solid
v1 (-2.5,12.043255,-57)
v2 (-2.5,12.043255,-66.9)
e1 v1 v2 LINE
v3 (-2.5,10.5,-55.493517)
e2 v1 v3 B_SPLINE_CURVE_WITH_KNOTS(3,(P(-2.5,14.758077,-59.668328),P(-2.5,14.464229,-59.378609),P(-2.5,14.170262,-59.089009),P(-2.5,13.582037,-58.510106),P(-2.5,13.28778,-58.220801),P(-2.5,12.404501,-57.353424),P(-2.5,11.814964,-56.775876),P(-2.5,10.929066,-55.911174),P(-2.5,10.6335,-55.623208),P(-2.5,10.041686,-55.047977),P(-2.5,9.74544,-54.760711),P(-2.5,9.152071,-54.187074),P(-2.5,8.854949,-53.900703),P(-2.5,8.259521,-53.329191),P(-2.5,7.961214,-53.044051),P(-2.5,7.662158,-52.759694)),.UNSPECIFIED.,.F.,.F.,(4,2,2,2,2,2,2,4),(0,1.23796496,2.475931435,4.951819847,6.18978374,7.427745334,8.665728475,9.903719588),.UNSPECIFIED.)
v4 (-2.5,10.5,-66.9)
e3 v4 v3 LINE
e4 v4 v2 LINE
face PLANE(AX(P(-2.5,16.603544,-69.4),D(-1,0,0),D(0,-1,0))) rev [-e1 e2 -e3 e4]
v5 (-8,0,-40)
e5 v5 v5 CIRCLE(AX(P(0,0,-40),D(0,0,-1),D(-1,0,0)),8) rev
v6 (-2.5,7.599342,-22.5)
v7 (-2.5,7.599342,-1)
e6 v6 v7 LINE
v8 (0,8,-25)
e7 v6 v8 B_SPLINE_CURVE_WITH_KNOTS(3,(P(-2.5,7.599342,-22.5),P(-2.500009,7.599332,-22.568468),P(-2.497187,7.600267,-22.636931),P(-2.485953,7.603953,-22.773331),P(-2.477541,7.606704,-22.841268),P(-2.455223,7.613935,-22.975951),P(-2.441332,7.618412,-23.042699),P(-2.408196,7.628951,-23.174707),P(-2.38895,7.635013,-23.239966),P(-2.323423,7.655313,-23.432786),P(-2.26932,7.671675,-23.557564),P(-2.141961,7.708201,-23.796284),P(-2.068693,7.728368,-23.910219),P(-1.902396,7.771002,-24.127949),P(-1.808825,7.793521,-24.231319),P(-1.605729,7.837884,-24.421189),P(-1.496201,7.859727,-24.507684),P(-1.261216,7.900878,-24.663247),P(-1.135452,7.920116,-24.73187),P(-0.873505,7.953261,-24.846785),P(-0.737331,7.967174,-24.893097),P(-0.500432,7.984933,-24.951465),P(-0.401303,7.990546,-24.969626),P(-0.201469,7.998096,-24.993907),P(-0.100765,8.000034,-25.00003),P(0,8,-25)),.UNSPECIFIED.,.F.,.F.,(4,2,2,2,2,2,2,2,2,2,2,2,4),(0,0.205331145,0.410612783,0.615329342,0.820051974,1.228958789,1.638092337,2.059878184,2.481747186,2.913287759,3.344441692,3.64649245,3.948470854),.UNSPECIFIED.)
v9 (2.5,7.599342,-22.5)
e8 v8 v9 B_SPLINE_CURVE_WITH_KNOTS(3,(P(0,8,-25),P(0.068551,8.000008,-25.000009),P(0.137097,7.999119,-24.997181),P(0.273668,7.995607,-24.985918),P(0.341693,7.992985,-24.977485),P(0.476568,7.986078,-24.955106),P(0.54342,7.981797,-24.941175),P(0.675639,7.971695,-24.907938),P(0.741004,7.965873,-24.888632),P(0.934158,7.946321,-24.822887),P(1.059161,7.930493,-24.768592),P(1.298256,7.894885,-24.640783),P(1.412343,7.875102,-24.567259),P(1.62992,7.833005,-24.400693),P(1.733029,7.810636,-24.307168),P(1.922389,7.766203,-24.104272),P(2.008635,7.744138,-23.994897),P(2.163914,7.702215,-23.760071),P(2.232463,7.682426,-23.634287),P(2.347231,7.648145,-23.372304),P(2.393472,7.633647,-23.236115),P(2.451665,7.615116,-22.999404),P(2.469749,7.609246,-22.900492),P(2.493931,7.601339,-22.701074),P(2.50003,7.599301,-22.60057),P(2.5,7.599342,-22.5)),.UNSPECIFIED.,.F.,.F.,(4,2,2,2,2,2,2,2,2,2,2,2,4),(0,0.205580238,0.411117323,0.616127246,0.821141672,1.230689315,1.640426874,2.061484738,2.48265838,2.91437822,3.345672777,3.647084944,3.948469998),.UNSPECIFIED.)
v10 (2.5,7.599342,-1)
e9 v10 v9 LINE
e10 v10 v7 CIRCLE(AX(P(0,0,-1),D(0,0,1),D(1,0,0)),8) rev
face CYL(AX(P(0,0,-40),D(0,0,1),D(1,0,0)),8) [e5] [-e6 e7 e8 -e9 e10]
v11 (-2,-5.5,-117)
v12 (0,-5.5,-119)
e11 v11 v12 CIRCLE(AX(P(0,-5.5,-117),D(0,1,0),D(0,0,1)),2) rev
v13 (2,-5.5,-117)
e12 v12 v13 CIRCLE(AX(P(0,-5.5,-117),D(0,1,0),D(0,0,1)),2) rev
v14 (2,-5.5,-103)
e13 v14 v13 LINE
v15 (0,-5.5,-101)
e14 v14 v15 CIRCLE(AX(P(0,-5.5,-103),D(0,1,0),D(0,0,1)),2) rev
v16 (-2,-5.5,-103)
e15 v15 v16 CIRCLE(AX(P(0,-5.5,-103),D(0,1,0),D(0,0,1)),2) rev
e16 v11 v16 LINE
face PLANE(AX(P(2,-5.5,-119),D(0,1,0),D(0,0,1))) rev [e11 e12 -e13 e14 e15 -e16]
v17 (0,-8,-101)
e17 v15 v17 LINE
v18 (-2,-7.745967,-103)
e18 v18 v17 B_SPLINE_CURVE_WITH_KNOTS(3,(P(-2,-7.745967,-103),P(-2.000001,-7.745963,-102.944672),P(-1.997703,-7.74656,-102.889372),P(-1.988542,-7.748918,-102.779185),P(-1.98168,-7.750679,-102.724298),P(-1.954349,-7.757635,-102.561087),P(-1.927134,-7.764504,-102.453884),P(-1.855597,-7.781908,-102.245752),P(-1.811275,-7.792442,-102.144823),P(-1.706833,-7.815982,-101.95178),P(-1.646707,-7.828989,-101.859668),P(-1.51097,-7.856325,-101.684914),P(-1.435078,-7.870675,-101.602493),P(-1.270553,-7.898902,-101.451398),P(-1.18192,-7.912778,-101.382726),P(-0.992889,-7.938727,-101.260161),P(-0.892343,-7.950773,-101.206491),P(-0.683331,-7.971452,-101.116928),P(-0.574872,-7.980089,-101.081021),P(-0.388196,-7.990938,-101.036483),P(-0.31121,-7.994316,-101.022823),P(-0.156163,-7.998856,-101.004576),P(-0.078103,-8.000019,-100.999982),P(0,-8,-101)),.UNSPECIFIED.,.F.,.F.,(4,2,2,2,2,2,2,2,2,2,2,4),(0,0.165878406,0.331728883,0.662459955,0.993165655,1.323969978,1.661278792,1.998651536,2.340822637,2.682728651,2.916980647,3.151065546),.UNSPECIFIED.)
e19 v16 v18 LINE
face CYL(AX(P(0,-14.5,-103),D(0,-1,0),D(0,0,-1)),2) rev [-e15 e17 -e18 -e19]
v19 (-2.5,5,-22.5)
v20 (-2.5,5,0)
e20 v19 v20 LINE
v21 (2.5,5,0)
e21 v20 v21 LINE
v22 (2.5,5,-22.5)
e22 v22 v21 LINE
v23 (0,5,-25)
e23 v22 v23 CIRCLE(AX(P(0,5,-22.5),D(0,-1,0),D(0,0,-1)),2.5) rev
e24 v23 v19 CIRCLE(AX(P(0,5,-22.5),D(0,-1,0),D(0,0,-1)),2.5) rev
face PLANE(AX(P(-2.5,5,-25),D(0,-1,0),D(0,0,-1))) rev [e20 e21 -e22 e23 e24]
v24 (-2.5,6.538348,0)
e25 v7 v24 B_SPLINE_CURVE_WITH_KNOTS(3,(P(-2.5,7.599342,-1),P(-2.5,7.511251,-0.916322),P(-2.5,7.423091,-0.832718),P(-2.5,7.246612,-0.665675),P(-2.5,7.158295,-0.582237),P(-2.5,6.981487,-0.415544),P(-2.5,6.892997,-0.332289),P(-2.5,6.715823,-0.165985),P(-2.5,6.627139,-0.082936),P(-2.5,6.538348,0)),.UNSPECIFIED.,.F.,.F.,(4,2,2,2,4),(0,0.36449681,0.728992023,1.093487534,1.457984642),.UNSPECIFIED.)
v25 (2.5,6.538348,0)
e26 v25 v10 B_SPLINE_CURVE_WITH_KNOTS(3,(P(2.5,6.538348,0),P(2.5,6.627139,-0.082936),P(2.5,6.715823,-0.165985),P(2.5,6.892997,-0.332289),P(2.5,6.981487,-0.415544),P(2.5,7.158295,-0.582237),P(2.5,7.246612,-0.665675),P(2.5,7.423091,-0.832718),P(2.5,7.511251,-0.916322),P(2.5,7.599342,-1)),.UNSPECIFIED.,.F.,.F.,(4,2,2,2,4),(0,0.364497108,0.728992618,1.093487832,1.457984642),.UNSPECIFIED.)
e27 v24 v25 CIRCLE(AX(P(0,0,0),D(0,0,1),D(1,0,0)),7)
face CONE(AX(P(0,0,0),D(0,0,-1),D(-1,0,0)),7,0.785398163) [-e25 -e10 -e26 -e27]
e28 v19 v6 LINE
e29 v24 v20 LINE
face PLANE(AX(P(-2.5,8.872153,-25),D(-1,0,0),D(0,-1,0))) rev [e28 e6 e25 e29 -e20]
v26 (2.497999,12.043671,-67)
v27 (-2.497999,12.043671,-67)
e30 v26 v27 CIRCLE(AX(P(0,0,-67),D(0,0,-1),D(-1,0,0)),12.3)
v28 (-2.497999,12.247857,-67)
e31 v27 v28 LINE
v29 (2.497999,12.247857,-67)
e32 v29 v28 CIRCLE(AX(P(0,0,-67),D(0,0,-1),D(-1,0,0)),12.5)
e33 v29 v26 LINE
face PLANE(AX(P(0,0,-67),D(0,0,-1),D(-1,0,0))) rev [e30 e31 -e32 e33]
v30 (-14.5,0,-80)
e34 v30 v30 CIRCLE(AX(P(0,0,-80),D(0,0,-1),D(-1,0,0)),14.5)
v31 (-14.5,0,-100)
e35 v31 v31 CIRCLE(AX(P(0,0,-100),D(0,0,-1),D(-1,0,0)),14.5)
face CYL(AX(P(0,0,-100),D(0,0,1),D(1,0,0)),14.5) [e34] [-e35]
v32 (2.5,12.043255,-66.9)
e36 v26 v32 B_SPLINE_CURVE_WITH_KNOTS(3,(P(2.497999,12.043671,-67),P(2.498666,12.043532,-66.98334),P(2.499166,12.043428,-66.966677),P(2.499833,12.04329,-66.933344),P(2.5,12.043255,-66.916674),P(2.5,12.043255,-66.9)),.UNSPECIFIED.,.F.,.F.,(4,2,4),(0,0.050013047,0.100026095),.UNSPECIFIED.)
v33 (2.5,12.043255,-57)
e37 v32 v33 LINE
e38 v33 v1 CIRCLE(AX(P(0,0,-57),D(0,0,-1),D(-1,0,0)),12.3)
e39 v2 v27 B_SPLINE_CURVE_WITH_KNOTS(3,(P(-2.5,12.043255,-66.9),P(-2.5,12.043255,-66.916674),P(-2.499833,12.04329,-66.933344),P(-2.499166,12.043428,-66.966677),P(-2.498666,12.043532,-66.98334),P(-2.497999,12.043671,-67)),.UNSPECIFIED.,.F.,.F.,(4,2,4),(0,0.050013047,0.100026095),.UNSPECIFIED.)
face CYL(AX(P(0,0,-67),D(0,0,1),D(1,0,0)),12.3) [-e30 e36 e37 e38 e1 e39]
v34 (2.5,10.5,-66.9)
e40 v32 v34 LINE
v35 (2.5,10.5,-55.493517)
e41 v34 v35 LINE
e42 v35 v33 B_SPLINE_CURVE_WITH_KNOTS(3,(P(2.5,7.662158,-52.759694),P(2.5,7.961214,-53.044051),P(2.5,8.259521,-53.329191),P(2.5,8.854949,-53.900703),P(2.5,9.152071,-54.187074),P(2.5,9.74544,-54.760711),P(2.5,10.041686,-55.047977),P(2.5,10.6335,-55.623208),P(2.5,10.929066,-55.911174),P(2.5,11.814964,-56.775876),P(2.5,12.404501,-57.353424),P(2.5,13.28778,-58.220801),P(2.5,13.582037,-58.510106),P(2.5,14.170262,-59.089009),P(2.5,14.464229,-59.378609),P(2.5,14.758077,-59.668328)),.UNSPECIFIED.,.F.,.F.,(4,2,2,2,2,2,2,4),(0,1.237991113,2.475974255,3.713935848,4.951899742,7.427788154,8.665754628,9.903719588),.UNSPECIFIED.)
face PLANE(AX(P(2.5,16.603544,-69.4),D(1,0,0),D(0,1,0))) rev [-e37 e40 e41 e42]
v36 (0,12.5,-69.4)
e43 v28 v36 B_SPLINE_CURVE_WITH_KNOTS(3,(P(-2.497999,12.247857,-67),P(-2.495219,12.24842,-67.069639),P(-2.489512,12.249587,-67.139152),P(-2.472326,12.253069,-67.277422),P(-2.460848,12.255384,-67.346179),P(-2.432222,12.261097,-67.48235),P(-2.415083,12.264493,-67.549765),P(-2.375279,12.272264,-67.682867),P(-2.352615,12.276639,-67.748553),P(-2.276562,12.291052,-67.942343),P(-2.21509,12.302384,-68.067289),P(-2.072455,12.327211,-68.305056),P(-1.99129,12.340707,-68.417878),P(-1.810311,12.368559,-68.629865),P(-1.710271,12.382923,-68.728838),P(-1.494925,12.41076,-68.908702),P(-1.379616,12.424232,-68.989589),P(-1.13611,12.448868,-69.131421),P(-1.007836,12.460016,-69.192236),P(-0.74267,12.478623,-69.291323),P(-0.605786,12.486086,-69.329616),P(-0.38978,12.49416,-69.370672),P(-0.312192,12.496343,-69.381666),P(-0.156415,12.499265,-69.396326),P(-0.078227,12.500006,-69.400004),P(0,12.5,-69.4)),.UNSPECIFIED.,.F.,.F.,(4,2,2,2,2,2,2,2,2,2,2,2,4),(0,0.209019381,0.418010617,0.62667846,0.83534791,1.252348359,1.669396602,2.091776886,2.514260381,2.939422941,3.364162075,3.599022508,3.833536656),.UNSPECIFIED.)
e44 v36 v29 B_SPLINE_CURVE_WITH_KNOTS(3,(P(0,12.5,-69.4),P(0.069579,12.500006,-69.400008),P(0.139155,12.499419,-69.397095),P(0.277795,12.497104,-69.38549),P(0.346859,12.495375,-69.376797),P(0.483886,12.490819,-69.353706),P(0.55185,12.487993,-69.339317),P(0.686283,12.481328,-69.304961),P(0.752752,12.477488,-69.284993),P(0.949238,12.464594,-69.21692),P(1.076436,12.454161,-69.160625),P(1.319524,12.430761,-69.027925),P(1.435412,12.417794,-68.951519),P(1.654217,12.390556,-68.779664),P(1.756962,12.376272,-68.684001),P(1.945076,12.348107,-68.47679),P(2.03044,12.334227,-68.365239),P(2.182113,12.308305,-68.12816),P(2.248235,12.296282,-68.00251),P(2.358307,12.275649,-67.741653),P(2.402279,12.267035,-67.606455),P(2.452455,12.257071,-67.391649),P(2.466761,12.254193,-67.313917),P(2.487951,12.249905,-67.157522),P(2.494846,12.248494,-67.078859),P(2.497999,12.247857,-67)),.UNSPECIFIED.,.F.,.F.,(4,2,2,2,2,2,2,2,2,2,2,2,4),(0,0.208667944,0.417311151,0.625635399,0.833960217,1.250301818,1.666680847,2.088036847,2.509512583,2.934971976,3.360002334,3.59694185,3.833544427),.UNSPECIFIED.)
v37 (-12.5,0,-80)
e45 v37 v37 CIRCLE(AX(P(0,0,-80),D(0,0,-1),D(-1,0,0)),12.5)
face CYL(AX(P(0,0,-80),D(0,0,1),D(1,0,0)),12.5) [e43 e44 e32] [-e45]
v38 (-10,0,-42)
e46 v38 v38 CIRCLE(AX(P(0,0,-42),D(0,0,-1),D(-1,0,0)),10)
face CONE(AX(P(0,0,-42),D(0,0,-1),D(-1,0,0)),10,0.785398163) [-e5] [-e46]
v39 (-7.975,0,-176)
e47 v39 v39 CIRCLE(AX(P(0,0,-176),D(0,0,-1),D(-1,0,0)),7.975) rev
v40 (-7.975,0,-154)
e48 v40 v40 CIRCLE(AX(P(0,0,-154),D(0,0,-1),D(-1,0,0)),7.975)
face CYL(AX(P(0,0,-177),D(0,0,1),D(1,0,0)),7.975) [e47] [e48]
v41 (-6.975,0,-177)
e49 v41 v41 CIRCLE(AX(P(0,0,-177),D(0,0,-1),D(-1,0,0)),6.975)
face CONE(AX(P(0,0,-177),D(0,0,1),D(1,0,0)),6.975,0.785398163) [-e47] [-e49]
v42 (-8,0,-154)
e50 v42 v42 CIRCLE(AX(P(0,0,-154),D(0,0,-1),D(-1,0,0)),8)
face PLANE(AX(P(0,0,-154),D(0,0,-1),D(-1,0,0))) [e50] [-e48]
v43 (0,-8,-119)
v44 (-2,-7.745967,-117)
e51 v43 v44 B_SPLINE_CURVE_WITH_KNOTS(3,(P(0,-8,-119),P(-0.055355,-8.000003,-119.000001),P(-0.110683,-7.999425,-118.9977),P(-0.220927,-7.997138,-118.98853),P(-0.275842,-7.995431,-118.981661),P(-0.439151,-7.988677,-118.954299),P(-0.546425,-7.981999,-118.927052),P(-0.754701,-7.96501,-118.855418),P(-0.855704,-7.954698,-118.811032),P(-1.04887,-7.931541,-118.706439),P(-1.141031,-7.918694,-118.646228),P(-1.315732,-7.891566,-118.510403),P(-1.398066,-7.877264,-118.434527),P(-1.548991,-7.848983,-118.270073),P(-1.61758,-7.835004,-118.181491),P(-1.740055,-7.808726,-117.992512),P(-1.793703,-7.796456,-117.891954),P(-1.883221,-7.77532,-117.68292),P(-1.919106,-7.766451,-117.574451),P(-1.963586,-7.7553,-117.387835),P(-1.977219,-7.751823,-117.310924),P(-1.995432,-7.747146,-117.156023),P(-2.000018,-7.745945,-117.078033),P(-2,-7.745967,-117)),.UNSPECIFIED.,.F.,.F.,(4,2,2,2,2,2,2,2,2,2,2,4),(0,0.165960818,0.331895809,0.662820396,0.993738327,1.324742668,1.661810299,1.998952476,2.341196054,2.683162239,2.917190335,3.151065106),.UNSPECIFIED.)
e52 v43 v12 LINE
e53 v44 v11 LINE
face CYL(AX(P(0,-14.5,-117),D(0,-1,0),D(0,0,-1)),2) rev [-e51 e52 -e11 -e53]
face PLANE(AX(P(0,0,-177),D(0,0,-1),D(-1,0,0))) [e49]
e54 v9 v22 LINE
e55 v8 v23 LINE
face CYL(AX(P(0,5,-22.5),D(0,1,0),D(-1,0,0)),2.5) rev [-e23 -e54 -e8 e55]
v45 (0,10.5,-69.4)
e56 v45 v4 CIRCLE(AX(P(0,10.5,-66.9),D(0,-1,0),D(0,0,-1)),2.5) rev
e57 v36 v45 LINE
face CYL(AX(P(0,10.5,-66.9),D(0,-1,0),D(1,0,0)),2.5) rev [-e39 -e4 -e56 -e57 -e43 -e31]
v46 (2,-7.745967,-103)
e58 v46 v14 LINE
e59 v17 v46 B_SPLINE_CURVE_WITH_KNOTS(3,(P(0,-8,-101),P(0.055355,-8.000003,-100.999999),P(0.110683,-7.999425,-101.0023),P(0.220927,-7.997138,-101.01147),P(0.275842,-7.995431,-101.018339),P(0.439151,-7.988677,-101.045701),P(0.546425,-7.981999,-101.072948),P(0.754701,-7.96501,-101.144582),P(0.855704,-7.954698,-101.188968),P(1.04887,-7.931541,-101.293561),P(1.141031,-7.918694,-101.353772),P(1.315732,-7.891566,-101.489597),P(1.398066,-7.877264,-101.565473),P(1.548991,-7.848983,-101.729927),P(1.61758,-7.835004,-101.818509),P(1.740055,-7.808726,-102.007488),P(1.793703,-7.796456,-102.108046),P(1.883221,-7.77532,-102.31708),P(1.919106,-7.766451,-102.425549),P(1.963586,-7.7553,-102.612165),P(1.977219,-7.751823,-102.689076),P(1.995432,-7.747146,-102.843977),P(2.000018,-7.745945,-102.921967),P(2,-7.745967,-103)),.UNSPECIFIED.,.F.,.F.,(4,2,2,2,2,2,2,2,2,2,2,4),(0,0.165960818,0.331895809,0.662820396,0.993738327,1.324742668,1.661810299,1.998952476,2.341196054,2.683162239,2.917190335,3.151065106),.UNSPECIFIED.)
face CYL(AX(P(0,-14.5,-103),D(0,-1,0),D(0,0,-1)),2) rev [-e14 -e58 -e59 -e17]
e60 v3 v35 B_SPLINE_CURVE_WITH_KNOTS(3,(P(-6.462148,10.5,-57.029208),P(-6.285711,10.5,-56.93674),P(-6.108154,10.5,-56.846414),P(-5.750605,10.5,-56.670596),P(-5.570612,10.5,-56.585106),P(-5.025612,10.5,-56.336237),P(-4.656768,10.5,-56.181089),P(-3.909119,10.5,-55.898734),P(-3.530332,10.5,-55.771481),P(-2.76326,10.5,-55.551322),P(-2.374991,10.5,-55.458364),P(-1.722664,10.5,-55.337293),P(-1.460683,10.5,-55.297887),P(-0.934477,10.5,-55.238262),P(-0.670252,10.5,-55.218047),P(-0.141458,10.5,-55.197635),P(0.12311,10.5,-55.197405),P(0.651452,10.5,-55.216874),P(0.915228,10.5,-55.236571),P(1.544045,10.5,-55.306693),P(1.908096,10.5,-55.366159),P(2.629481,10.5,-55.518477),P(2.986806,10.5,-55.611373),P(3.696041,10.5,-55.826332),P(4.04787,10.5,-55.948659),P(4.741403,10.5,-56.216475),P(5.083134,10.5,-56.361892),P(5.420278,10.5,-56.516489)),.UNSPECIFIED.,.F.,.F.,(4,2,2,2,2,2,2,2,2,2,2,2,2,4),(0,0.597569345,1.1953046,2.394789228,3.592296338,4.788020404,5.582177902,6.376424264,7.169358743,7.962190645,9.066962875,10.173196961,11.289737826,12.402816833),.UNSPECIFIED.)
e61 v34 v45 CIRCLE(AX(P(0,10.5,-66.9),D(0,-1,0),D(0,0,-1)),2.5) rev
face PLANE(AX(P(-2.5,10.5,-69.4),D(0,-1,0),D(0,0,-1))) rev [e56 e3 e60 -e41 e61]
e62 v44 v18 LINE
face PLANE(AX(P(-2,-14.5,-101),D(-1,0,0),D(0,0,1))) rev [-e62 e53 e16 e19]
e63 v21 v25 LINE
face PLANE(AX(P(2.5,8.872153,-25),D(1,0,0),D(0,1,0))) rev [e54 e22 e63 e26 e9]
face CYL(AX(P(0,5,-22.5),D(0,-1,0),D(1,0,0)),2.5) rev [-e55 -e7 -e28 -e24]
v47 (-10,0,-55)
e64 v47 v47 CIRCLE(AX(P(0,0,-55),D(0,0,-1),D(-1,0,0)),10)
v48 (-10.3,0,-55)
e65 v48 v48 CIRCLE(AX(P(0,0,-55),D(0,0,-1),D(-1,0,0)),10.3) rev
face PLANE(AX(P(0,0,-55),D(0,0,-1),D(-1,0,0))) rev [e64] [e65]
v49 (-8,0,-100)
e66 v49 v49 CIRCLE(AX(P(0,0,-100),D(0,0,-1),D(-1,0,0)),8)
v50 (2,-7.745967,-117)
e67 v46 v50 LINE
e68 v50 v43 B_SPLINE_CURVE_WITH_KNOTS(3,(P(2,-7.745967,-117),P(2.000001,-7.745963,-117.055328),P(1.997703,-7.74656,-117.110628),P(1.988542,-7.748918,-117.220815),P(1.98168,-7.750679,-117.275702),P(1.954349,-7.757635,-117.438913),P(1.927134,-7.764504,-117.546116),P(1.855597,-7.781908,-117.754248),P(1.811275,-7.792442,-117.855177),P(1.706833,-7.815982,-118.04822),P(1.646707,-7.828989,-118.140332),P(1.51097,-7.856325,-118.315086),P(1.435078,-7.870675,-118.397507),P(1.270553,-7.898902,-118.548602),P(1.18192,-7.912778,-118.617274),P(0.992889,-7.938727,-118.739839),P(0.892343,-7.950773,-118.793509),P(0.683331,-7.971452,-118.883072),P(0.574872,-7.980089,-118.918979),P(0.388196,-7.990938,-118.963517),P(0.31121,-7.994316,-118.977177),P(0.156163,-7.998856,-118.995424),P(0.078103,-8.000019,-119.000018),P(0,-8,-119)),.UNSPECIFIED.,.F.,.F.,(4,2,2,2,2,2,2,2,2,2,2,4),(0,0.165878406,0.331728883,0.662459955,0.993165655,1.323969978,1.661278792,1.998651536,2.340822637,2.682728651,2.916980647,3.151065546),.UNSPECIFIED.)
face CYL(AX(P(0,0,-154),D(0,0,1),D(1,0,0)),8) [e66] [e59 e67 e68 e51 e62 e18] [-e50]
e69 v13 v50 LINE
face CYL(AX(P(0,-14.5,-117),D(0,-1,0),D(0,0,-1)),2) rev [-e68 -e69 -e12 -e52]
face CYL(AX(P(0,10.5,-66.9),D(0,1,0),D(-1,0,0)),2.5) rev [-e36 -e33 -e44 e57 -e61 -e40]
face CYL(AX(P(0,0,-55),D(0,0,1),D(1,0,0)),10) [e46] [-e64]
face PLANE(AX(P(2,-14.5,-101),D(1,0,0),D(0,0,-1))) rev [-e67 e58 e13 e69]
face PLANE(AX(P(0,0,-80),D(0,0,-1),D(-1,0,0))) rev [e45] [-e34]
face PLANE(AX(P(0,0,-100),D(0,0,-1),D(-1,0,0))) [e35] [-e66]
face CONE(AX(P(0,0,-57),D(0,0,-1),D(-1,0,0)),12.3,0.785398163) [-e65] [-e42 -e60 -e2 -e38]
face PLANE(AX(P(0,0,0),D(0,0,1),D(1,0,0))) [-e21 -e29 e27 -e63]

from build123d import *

# Parameters (mm, degrees)
SKETCH1_R          = 8
EXTRUDE1_DEPTH     = 40
SKETCH2_W          = 5
SKETCH2_H          = 3.872152866
CUT_EXTRUDE1_DEPTH = 25
FILLET1_R          = 2.5
CHAMFER1_SIZE      = 1
SKETCH3_R          = 10
EXTRUDE2_DEPTH     = 15
CHAMFER2_SIZE      = 2
SKETCH4_R          = 12.3
EXTRUDE3_DEPTH     = 12
CHAMFER3_SIZE      = 2
SKETCH5_R          = 12.5
EXTRUDE4_DEPTH     = 13
SKETCH6_R          = 14.5
EXTRUDE5_DEPTH     = 20
SKETCH10_W         = 5
SKETCH10_H         = 6.103543743
CUT_EXTRUDE2_DEPTH = 14.4
FILLET2_R          = 2.5
SKETCH9_R          = 8
EXTRUDE6_DEPTH     = 54
SKETCH11_W         = 4
SKETCH11_H         = 18
CUT_EXTRUDE3_DEPTH = 156.968746869
FILLET3_R          = 2
SKETCH12_R         = 7.975
EXTRUDE7_DEPTH     = 23
CHAMFER4_SIZE      = 1


# Some blends are built 0.0001 mm under size
with BuildPart() as part:
    # Sketch1 → Extrude1 (new body)
    with BuildSketch(Plane.XY):
        Circle(SKETCH1_R)
    extrude(amount=-EXTRUDE1_DEPTH)

    # Sketch2 → Cut-Extrude1 (cut)
    with BuildSketch(Plane.XY):
        with Locations((0, 6.936076433)):
            Rectangle(SKETCH2_W, SKETCH2_H)
    extrude(amount=-CUT_EXTRUDE1_DEPTH, mode=Mode.SUBTRACT)

    # Fillet1
    fillet1_edges = [part.edges().sort_by_distance(p)[0] for p in [
        (2.5, 6.299671038, -25),
        (-2.5, 6.299671038, -25),
    ]]
    fillet(fillet1_edges, radius=FILLET1_R - 0.0001)  # a hair under: the kernel refuses the full size

    # Chamfer1
    chamfer1_edges = [part.edges().sort_by_distance(p)[0] for p in [
        (-4.69041576, -6.480740698, 0),
    ]]
    chamfer(chamfer1_edges, length=CHAMFER1_SIZE)

    # Sketch3 → Extrude2 (add)
    with BuildSketch(Plane(origin=(0, 0, -40), x_dir=(-1, 0, 0), z_dir=(0, 0, -1))):
        Circle(SKETCH3_R)
    extrude(amount=EXTRUDE2_DEPTH)

    # Chamfer2
    chamfer2_edges = [part.edges().sort_by_distance(p)[0] for p in [
        (10, 0, -40),
    ]]
    chamfer(chamfer2_edges, length=CHAMFER2_SIZE - 0.0001)  # a hair under: the kernel refuses the full size

    # Sketch4 → Extrude3 (add)
    with BuildSketch(Plane(origin=(0, 0, -55), x_dir=(-1, 0, 0), z_dir=(0, 0, -1))):
        Circle(SKETCH4_R)
    extrude(amount=EXTRUDE3_DEPTH)

    # Chamfer3
    chamfer3_edges = [part.edges().sort_by_distance(p)[0] for p in [
        (12.3, 0, -55),
    ]]
    chamfer(chamfer3_edges, length=CHAMFER3_SIZE)

    # Sketch5 → Extrude4 (add)
    with BuildSketch(Plane(origin=(0, 0, -67), x_dir=(-1, 0, 0), z_dir=(0, 0, -1))):
        with Locations(Location((0, 0, 0), (0, 0, 180))):
            Circle(SKETCH5_R)
    extrude(amount=EXTRUDE4_DEPTH)

    # Sketch6 → Extrude5 (add)
    with BuildSketch(Plane(origin=(0, 0, -80), x_dir=(-1, 0, 0), z_dir=(0, 0, -1))):
        Circle(SKETCH6_R)
    extrude(amount=EXTRUDE5_DEPTH)

    # Sketch10 → Cut-Extrude2 (cut)
    with BuildSketch(Plane.XY.offset(-55)):
        with Locations((0, 13.551771871)):
            Rectangle(SKETCH10_W, SKETCH10_H)
    extrude(amount=-CUT_EXTRUDE2_DEPTH, mode=Mode.SUBTRACT)

    # Fillet2
    # the kernel refuses this fillet: 2.5 mm, written as the material it adds along each edge
    with BuildSketch(Plane(origin=(2.5, 18.497448714, -69.4), x_dir=(0, 0, 1), z_dir=(0, -1, 0))) as fillet2_piece_1_section:
        with BuildLine():
            CenterArc((FILLET2_R, FILLET2_R), FILLET2_R, 180, 90)
            Line((0, FILLET2_R), (0, 0))
            Line((0, 0), (FILLET2_R, 0))
        make_face()
    fillet2_piece_1 = extrude(amount=14.247448714, mode=Mode.PRIVATE)
    fillet2_piece_1 = fillet2_piece_1 & Plane(origin=(0, 0, -68.840122938), x_dir=(1, 0, 0), z_dir=(0, 0, 1)) * Cylinder(12.5, 39, mode=Mode.PRIVATE)
    fillet2_piece_1 = split(fillet2_piece_1, bisect_by=Plane(origin=(1.944027658, 12.237538555, -67), z_dir=(0, 0, -1)), keep=Keep.TOP, mode=Mode.PRIVATE)
    add(fillet2_piece_1)
    with BuildSketch(Plane(origin=(2.5, 18.497448714, -69.4), x_dir=(0, 0, 1), z_dir=(0, -1, 0))) as fillet2_piece_2_section:
        with BuildLine():
            CenterArc((FILLET2_R, FILLET2_R), FILLET2_R, 180, 90)
            Line((0, FILLET2_R), (0, 0))
            Line((0, 0), (FILLET2_R, 0))
        make_face()
    fillet2_piece_2 = extrude(amount=14.247448714, mode=Mode.PRIVATE)
    fillet2_piece_2 = fillet2_piece_2 & Plane(origin=(0, 0, -66.975002686), x_dir=(-1, 0, 0), z_dir=(0, 0, 1)) * Cylinder(12.3, 39, mode=Mode.PRIVATE)
    add(fillet2_piece_2)
    with BuildSketch(Plane(origin=(-2.5, 4.25, -69.4), x_dir=(1, 0, 0), z_dir=(0, 1, 0))) as fillet2_piece_3_section:
        with BuildLine():
            CenterArc((FILLET2_R, -FILLET2_R), FILLET2_R, 90, 90)
            Line((0, -FILLET2_R), (0, 0))
            Line((0, 0), (FILLET2_R, 0))
        make_face()
    fillet2_piece_3 = extrude(amount=14.247448714, mode=Mode.PRIVATE)
    fillet2_piece_3 = fillet2_piece_3 & Plane(origin=(0, 0, -68.853362748), x_dir=(1, 0, 0), z_dir=(0, 0, 1)) * Cylinder(12.5, 39, mode=Mode.PRIVATE)
    fillet2_piece_3 = split(fillet2_piece_3, bisect_by=Plane(origin=(-1.922744222, 11.319637846, -67), z_dir=(0, 0, -1)), keep=Keep.TOP, mode=Mode.PRIVATE)
    add(fillet2_piece_3)
    with BuildSketch(Plane(origin=(-2.5, 4.25, -69.4), x_dir=(1, 0, 0), z_dir=(0, 1, 0))) as fillet2_piece_4_section:
        with BuildLine():
            CenterArc((FILLET2_R, -FILLET2_R), FILLET2_R, 90, 90)
            Line((0, -FILLET2_R), (0, 0))
            Line((0, 0), (FILLET2_R, 0))
        make_face()
    fillet2_piece_4 = extrude(amount=14.247448714, mode=Mode.PRIVATE)
    fillet2_piece_4 = fillet2_piece_4 & Plane(origin=(0, 0, -66.975002689), x_dir=(-1, 0, 0), z_dir=(0, 0, 1)) * Cylinder(12.3, 39, mode=Mode.PRIVATE)
    add(fillet2_piece_4)

    # Sketch9 → Extrude6 (add)
    with BuildSketch(Plane(origin=(0, 0, -100), x_dir=(-1, 0, 0), z_dir=(0, 0, -1))):
        with Locations(Location((0, 0, 0), (0, 0, 108.209956864))):
            Circle(SKETCH9_R)
    extrude(amount=EXTRUDE6_DEPTH)

    # Sketch11 → Cut-Extrude3 (cut, through all)
    with BuildSketch(Plane(origin=(0, -5.5, 0), x_dir=(-1, 0, 0), z_dir=(0, 1, 0))):
        with Locations((0, -110)):
            Rectangle(SKETCH11_W, SKETCH11_H)
    extrude(amount=-CUT_EXTRUDE3_DEPTH, mode=Mode.SUBTRACT)

    # Fillet3
    fillet3_edges = [part.edges().sort_by_distance(p)[0] for p in [
        (-2, -6.622983346, -119),
        (2, -6.622983346, -119),
        (-2, -6.622983346, -101),
        (2, -6.622983346, -101),
    ]]
    fillet(fillet3_edges, radius=FILLET3_R - 0.0001)  # a hair under: the kernel refuses the full size

    # Sketch12 → Extrude7 (add)
    with BuildSketch(Plane(origin=(0, 0, -154), x_dir=(-1, 0, 0), z_dir=(0, 0, -1))):
        Circle(SKETCH12_R)
    extrude(amount=EXTRUDE7_DEPTH)

    # Chamfer4
    chamfer4_edges = [part.edges().sort_by_distance(p)[0] for p in [
        (7.975, 0, -177),
    ]]
    chamfer(chamfer4_edges, length=CHAMFER4_SIZE)


solid = part.part
